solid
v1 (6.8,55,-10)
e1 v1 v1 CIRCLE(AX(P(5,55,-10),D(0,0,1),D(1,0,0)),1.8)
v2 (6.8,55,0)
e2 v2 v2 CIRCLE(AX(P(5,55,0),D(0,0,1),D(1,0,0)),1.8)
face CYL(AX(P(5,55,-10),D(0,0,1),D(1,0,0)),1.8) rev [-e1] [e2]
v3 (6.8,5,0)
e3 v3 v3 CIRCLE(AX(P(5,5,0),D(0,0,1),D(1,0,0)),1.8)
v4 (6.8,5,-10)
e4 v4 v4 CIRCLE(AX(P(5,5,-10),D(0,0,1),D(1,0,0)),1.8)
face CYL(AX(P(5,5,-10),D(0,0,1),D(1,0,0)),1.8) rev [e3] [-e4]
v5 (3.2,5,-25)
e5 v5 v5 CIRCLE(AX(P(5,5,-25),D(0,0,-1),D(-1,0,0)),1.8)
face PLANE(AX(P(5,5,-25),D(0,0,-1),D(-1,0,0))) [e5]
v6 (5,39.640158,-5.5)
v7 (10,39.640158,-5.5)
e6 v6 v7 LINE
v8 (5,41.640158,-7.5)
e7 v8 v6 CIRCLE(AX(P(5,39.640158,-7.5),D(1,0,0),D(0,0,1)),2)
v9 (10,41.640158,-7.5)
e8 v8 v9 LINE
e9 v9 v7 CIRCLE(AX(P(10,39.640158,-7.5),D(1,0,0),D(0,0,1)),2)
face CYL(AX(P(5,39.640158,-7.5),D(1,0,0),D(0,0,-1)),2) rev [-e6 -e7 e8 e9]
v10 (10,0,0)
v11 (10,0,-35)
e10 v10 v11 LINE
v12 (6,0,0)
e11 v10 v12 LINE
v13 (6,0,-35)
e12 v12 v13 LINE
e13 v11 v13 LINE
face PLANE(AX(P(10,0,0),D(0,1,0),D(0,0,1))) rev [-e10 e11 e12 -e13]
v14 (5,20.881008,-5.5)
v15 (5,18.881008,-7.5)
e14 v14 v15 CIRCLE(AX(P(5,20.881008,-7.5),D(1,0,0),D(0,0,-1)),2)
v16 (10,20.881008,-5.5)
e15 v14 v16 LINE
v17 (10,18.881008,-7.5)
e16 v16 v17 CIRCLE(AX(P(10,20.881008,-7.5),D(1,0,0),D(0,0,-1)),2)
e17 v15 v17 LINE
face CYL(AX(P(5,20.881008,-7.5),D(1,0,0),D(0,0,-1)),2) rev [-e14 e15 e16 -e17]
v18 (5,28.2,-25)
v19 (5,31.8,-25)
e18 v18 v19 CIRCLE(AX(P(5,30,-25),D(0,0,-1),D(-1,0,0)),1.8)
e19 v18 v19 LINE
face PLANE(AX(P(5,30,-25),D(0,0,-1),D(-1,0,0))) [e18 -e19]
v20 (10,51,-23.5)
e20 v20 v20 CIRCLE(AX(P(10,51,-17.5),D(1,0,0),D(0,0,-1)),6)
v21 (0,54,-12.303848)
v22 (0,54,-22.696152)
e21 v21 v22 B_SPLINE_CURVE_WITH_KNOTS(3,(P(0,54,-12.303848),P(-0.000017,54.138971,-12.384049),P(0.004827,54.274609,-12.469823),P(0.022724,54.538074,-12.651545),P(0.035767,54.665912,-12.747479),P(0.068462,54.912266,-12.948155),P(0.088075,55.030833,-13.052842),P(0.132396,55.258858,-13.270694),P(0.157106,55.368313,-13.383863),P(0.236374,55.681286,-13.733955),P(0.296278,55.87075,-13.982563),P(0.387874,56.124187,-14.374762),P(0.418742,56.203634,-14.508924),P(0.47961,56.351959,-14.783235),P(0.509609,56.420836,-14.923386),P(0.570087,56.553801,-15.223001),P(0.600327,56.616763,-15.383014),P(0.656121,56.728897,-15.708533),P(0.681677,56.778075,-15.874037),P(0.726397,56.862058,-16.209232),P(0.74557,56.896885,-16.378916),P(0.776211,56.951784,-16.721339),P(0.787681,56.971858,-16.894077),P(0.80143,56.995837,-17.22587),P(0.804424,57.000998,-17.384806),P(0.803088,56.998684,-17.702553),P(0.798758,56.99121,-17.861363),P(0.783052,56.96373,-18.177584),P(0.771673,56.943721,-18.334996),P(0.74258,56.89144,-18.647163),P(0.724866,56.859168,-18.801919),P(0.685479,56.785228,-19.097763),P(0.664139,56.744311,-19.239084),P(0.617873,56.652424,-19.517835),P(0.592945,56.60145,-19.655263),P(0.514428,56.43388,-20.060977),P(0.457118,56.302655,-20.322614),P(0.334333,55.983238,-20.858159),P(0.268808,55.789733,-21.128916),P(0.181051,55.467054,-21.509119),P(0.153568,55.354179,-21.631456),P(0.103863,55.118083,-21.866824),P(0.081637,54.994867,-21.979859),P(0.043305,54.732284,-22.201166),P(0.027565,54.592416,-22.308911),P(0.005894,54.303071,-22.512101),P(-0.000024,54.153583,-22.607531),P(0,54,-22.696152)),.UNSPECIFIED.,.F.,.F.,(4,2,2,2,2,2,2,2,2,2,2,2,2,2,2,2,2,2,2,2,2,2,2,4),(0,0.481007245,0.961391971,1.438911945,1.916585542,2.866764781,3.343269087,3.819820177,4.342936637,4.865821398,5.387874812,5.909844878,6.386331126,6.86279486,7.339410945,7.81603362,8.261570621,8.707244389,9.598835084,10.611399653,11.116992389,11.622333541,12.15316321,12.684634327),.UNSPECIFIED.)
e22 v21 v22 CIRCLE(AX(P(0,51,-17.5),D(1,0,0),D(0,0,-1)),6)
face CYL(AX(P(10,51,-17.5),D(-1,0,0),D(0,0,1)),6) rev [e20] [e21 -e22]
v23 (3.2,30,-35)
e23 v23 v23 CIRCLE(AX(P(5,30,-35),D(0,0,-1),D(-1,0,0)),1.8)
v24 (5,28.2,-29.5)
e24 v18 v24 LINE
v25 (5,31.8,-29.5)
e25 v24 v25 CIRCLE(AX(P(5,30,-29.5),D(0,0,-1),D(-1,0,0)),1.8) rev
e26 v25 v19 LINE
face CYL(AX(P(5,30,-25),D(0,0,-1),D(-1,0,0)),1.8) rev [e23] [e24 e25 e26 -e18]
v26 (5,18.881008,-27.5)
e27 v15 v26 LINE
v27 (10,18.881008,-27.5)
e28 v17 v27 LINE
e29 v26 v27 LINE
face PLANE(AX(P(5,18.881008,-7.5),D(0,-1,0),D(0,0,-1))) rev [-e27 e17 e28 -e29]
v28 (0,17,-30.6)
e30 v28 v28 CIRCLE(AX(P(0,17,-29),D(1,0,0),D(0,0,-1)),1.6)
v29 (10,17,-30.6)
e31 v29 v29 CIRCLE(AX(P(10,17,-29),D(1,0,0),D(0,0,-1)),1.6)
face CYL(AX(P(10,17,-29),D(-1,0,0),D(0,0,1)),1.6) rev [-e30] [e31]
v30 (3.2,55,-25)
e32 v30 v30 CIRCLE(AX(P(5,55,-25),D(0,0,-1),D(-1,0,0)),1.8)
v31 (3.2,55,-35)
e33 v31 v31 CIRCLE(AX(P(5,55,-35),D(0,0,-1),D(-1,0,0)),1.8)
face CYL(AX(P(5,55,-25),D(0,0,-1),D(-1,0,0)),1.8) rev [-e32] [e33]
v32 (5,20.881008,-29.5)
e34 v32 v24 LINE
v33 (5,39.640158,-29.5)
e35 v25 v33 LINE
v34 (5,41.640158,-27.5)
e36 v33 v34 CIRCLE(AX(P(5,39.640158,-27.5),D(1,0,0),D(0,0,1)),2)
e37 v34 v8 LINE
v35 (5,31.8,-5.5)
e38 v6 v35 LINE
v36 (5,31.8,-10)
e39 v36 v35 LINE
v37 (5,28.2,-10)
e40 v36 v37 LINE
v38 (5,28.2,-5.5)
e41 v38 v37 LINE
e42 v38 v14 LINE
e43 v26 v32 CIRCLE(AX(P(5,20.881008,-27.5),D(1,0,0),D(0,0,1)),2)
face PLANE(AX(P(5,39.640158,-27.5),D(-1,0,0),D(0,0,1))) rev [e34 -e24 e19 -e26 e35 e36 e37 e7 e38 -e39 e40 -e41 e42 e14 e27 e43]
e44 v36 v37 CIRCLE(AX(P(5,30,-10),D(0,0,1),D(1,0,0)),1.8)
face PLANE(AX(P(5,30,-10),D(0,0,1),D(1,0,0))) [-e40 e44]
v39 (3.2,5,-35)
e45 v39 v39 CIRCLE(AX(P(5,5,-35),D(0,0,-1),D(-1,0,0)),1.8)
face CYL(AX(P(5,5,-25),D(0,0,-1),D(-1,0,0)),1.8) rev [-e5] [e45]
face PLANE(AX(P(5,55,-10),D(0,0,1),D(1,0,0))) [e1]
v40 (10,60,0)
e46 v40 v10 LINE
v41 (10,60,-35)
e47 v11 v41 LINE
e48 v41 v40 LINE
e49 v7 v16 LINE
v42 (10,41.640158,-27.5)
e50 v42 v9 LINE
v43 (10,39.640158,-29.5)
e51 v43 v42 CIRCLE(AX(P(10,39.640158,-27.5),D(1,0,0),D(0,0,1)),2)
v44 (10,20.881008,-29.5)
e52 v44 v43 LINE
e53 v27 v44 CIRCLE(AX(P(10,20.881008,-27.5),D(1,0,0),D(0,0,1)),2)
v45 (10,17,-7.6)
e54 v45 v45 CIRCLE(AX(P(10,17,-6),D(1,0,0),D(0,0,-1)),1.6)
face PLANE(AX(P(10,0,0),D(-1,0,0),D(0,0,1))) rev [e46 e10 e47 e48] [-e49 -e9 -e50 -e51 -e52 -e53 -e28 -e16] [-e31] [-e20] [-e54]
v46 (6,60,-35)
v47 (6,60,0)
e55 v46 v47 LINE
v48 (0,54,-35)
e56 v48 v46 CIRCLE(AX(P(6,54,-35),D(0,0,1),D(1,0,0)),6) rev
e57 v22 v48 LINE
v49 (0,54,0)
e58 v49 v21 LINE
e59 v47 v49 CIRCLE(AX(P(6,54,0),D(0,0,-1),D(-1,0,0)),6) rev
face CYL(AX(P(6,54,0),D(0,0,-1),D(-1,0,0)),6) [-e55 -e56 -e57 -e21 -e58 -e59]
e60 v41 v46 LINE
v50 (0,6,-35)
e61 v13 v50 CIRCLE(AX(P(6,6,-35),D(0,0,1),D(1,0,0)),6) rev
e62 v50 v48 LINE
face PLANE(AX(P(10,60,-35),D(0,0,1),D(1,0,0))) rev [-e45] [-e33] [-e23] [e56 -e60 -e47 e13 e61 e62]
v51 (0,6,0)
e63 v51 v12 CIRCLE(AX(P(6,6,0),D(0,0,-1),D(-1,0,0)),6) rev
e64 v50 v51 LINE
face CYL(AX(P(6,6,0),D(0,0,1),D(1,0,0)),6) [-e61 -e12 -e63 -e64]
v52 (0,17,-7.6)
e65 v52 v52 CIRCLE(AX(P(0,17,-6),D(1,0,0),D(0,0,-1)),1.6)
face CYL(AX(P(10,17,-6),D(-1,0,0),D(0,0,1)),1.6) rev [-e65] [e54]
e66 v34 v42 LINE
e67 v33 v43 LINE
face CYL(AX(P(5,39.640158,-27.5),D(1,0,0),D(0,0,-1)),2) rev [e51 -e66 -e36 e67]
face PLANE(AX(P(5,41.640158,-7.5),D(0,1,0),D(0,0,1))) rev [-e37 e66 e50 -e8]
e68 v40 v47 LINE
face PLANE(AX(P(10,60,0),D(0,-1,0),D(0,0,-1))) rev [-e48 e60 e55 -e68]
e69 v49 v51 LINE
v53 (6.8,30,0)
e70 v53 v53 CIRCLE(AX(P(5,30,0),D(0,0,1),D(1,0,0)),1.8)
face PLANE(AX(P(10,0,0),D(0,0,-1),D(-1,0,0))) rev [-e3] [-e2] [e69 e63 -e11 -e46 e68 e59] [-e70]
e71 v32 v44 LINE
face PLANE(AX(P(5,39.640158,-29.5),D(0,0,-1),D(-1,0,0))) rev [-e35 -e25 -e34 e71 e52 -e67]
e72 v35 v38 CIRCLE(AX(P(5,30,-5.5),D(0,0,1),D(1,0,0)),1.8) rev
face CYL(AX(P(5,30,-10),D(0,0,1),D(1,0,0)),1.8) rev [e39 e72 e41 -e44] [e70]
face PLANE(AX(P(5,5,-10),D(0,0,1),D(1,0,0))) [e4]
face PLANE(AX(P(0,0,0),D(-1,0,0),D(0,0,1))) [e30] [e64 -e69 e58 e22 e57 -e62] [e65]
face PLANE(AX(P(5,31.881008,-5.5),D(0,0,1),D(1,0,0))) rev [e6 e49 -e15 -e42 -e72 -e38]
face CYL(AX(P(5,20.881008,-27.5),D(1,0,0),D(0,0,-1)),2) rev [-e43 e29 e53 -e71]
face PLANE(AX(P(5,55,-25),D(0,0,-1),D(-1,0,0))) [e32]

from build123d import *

# Parameters (mm, degrees)
SKETCH1_W           = 35
SKETCH1_H           = 60
SKETCH1_R           = 6
SKETCH1_R_2         = 1.6
BOSS_EXTRUDE1_DEPTH = 10
SKETCH2_R           = 1.8
CUT_EXTRUDE1_DEPTH  = 10
CUT_EXTRUDE2_START  = -10
SKETCH3_R           = 1.8
CUT_EXTRUDE2_DEPTH  = 10
CUT_EXTRUDE3_DEPTH  = 5
FILLET1_R           = 6


with BuildPart() as part:
    # Sketch1 → Boss-Extrude1 (new body)
    with BuildSketch(Plane(origin=(0, 0, 0), x_dir=(0, 0, -1), z_dir=(1, 0, 0))):
        with Locations((17.5, 30)):
            Rectangle(SKETCH1_W, SKETCH1_H)
        with Locations((17.5, 51)):
            Circle(SKETCH1_R, mode=Mode.SUBTRACT)
        with Locations((6, 17)):
            Circle(SKETCH1_R_2, mode=Mode.SUBTRACT)
        with Locations((29, 17)):
            Circle(SKETCH1_R_2, mode=Mode.SUBTRACT)
    extrude(amount=BOSS_EXTRUDE1_DEPTH)

    # Sketch2 → Cut-Extrude1 (cut)
    with BuildSketch(Plane(origin=(0, 0, -35), x_dir=(-1, 0, 0), z_dir=(0, 0, -1))):
        with Locations((-5, 55)):
            Circle(SKETCH2_R)
        with Locations((-5, 30)):
            Circle(SKETCH2_R)
        with Locations((-5, 5)):
            Circle(SKETCH2_R)
    extrude(amount=-CUT_EXTRUDE1_DEPTH, mode=Mode.SUBTRACT)

    # Sketch3 → Cut-Extrude2 (cut)
    with BuildSketch(Plane.XY.offset(CUT_EXTRUDE2_START)):
        with Locations(Location((5, 55, 0), (0, 0, 180))):
            Circle(SKETCH3_R)
        with Locations(Location((5, 30, 0), (0, 0, 180))):
            Circle(SKETCH3_R)
        with Locations(Location((5, 5, 0), (0, 0, 180))):
            Circle(SKETCH3_R)
    extrude(amount=CUT_EXTRUDE2_DEPTH, mode=Mode.SUBTRACT)

    # Sketch4 → Cut-Extrude3 (cut)
    with BuildSketch(Plane(origin=(10, 0, 0), x_dir=(0, 0, -1), z_dir=(1, 0, 0))):
        with BuildLine():
            Line((29.5, 31.881008272), (29.5, 20.881008272))
            ThreePointArc((29.5, 20.881008272), (28.914213562, 19.466794709), (27.5, 18.881008272))
            Line((27.5, 18.881008272), (7.5, 18.881008272))
            ThreePointArc((7.5, 18.881008272), (6.085786438, 19.466794709), (5.5, 20.881008272))
            Line((5.5, 20.881008272), (5.5, 31.881008272))
            Line((5.5, 31.881008272), (5.5, 36.640158011))
            Line((5.5, 36.640158011), (5.5, 39.640158011))
            ThreePointArc((5.5, 39.640158011), (6.085786438, 41.054371573), (7.5, 41.640158011))
            Line((7.5, 41.640158011), (27.5, 41.640158011))
            ThreePointArc((27.5, 41.640158011), (28.914213562, 41.054371573), (29.5, 39.640158011))
            Line((29.5, 39.640158011), (29.5, 36.640158011))
            Line((29.5, 36.640158011), (29.5, 31.881008272))
        make_face()
    extrude(amount=-CUT_EXTRUDE3_DEPTH, mode=Mode.SUBTRACT)

    # Fillet1
    # the kernel refuses this fillet: 6 mm, written as the material it takes off along each edge
    with BuildSketch(Plane(origin=(0, 60, -50), x_dir=(0, -1, 0), z_dir=(0, 0, 1))) as fillet1_piece_1:
        with BuildLine():
            CenterArc((FILLET1_R, FILLET1_R), FILLET1_R, 180, 90)
            Line((0, FILLET1_R), (0, 0))
            Line((0, 0), (FILLET1_R, 0))
        make_face()
    extrude(amount=65, mode=Mode.SUBTRACT)
    with BuildSketch(Plane(origin=(0, 0, 15), x_dir=(1, 0, 0), z_dir=(0, 0, -1))) as fillet1_piece_2:
        with BuildLine():
            CenterArc((FILLET1_R, -FILLET1_R), FILLET1_R, 90, 90)
            Line((0, -FILLET1_R), (0, 0))
            Line((0, 0), (FILLET1_R, 0))
        make_face()
    extrude(amount=65, mode=Mode.SUBTRACT)


solid = part.part
